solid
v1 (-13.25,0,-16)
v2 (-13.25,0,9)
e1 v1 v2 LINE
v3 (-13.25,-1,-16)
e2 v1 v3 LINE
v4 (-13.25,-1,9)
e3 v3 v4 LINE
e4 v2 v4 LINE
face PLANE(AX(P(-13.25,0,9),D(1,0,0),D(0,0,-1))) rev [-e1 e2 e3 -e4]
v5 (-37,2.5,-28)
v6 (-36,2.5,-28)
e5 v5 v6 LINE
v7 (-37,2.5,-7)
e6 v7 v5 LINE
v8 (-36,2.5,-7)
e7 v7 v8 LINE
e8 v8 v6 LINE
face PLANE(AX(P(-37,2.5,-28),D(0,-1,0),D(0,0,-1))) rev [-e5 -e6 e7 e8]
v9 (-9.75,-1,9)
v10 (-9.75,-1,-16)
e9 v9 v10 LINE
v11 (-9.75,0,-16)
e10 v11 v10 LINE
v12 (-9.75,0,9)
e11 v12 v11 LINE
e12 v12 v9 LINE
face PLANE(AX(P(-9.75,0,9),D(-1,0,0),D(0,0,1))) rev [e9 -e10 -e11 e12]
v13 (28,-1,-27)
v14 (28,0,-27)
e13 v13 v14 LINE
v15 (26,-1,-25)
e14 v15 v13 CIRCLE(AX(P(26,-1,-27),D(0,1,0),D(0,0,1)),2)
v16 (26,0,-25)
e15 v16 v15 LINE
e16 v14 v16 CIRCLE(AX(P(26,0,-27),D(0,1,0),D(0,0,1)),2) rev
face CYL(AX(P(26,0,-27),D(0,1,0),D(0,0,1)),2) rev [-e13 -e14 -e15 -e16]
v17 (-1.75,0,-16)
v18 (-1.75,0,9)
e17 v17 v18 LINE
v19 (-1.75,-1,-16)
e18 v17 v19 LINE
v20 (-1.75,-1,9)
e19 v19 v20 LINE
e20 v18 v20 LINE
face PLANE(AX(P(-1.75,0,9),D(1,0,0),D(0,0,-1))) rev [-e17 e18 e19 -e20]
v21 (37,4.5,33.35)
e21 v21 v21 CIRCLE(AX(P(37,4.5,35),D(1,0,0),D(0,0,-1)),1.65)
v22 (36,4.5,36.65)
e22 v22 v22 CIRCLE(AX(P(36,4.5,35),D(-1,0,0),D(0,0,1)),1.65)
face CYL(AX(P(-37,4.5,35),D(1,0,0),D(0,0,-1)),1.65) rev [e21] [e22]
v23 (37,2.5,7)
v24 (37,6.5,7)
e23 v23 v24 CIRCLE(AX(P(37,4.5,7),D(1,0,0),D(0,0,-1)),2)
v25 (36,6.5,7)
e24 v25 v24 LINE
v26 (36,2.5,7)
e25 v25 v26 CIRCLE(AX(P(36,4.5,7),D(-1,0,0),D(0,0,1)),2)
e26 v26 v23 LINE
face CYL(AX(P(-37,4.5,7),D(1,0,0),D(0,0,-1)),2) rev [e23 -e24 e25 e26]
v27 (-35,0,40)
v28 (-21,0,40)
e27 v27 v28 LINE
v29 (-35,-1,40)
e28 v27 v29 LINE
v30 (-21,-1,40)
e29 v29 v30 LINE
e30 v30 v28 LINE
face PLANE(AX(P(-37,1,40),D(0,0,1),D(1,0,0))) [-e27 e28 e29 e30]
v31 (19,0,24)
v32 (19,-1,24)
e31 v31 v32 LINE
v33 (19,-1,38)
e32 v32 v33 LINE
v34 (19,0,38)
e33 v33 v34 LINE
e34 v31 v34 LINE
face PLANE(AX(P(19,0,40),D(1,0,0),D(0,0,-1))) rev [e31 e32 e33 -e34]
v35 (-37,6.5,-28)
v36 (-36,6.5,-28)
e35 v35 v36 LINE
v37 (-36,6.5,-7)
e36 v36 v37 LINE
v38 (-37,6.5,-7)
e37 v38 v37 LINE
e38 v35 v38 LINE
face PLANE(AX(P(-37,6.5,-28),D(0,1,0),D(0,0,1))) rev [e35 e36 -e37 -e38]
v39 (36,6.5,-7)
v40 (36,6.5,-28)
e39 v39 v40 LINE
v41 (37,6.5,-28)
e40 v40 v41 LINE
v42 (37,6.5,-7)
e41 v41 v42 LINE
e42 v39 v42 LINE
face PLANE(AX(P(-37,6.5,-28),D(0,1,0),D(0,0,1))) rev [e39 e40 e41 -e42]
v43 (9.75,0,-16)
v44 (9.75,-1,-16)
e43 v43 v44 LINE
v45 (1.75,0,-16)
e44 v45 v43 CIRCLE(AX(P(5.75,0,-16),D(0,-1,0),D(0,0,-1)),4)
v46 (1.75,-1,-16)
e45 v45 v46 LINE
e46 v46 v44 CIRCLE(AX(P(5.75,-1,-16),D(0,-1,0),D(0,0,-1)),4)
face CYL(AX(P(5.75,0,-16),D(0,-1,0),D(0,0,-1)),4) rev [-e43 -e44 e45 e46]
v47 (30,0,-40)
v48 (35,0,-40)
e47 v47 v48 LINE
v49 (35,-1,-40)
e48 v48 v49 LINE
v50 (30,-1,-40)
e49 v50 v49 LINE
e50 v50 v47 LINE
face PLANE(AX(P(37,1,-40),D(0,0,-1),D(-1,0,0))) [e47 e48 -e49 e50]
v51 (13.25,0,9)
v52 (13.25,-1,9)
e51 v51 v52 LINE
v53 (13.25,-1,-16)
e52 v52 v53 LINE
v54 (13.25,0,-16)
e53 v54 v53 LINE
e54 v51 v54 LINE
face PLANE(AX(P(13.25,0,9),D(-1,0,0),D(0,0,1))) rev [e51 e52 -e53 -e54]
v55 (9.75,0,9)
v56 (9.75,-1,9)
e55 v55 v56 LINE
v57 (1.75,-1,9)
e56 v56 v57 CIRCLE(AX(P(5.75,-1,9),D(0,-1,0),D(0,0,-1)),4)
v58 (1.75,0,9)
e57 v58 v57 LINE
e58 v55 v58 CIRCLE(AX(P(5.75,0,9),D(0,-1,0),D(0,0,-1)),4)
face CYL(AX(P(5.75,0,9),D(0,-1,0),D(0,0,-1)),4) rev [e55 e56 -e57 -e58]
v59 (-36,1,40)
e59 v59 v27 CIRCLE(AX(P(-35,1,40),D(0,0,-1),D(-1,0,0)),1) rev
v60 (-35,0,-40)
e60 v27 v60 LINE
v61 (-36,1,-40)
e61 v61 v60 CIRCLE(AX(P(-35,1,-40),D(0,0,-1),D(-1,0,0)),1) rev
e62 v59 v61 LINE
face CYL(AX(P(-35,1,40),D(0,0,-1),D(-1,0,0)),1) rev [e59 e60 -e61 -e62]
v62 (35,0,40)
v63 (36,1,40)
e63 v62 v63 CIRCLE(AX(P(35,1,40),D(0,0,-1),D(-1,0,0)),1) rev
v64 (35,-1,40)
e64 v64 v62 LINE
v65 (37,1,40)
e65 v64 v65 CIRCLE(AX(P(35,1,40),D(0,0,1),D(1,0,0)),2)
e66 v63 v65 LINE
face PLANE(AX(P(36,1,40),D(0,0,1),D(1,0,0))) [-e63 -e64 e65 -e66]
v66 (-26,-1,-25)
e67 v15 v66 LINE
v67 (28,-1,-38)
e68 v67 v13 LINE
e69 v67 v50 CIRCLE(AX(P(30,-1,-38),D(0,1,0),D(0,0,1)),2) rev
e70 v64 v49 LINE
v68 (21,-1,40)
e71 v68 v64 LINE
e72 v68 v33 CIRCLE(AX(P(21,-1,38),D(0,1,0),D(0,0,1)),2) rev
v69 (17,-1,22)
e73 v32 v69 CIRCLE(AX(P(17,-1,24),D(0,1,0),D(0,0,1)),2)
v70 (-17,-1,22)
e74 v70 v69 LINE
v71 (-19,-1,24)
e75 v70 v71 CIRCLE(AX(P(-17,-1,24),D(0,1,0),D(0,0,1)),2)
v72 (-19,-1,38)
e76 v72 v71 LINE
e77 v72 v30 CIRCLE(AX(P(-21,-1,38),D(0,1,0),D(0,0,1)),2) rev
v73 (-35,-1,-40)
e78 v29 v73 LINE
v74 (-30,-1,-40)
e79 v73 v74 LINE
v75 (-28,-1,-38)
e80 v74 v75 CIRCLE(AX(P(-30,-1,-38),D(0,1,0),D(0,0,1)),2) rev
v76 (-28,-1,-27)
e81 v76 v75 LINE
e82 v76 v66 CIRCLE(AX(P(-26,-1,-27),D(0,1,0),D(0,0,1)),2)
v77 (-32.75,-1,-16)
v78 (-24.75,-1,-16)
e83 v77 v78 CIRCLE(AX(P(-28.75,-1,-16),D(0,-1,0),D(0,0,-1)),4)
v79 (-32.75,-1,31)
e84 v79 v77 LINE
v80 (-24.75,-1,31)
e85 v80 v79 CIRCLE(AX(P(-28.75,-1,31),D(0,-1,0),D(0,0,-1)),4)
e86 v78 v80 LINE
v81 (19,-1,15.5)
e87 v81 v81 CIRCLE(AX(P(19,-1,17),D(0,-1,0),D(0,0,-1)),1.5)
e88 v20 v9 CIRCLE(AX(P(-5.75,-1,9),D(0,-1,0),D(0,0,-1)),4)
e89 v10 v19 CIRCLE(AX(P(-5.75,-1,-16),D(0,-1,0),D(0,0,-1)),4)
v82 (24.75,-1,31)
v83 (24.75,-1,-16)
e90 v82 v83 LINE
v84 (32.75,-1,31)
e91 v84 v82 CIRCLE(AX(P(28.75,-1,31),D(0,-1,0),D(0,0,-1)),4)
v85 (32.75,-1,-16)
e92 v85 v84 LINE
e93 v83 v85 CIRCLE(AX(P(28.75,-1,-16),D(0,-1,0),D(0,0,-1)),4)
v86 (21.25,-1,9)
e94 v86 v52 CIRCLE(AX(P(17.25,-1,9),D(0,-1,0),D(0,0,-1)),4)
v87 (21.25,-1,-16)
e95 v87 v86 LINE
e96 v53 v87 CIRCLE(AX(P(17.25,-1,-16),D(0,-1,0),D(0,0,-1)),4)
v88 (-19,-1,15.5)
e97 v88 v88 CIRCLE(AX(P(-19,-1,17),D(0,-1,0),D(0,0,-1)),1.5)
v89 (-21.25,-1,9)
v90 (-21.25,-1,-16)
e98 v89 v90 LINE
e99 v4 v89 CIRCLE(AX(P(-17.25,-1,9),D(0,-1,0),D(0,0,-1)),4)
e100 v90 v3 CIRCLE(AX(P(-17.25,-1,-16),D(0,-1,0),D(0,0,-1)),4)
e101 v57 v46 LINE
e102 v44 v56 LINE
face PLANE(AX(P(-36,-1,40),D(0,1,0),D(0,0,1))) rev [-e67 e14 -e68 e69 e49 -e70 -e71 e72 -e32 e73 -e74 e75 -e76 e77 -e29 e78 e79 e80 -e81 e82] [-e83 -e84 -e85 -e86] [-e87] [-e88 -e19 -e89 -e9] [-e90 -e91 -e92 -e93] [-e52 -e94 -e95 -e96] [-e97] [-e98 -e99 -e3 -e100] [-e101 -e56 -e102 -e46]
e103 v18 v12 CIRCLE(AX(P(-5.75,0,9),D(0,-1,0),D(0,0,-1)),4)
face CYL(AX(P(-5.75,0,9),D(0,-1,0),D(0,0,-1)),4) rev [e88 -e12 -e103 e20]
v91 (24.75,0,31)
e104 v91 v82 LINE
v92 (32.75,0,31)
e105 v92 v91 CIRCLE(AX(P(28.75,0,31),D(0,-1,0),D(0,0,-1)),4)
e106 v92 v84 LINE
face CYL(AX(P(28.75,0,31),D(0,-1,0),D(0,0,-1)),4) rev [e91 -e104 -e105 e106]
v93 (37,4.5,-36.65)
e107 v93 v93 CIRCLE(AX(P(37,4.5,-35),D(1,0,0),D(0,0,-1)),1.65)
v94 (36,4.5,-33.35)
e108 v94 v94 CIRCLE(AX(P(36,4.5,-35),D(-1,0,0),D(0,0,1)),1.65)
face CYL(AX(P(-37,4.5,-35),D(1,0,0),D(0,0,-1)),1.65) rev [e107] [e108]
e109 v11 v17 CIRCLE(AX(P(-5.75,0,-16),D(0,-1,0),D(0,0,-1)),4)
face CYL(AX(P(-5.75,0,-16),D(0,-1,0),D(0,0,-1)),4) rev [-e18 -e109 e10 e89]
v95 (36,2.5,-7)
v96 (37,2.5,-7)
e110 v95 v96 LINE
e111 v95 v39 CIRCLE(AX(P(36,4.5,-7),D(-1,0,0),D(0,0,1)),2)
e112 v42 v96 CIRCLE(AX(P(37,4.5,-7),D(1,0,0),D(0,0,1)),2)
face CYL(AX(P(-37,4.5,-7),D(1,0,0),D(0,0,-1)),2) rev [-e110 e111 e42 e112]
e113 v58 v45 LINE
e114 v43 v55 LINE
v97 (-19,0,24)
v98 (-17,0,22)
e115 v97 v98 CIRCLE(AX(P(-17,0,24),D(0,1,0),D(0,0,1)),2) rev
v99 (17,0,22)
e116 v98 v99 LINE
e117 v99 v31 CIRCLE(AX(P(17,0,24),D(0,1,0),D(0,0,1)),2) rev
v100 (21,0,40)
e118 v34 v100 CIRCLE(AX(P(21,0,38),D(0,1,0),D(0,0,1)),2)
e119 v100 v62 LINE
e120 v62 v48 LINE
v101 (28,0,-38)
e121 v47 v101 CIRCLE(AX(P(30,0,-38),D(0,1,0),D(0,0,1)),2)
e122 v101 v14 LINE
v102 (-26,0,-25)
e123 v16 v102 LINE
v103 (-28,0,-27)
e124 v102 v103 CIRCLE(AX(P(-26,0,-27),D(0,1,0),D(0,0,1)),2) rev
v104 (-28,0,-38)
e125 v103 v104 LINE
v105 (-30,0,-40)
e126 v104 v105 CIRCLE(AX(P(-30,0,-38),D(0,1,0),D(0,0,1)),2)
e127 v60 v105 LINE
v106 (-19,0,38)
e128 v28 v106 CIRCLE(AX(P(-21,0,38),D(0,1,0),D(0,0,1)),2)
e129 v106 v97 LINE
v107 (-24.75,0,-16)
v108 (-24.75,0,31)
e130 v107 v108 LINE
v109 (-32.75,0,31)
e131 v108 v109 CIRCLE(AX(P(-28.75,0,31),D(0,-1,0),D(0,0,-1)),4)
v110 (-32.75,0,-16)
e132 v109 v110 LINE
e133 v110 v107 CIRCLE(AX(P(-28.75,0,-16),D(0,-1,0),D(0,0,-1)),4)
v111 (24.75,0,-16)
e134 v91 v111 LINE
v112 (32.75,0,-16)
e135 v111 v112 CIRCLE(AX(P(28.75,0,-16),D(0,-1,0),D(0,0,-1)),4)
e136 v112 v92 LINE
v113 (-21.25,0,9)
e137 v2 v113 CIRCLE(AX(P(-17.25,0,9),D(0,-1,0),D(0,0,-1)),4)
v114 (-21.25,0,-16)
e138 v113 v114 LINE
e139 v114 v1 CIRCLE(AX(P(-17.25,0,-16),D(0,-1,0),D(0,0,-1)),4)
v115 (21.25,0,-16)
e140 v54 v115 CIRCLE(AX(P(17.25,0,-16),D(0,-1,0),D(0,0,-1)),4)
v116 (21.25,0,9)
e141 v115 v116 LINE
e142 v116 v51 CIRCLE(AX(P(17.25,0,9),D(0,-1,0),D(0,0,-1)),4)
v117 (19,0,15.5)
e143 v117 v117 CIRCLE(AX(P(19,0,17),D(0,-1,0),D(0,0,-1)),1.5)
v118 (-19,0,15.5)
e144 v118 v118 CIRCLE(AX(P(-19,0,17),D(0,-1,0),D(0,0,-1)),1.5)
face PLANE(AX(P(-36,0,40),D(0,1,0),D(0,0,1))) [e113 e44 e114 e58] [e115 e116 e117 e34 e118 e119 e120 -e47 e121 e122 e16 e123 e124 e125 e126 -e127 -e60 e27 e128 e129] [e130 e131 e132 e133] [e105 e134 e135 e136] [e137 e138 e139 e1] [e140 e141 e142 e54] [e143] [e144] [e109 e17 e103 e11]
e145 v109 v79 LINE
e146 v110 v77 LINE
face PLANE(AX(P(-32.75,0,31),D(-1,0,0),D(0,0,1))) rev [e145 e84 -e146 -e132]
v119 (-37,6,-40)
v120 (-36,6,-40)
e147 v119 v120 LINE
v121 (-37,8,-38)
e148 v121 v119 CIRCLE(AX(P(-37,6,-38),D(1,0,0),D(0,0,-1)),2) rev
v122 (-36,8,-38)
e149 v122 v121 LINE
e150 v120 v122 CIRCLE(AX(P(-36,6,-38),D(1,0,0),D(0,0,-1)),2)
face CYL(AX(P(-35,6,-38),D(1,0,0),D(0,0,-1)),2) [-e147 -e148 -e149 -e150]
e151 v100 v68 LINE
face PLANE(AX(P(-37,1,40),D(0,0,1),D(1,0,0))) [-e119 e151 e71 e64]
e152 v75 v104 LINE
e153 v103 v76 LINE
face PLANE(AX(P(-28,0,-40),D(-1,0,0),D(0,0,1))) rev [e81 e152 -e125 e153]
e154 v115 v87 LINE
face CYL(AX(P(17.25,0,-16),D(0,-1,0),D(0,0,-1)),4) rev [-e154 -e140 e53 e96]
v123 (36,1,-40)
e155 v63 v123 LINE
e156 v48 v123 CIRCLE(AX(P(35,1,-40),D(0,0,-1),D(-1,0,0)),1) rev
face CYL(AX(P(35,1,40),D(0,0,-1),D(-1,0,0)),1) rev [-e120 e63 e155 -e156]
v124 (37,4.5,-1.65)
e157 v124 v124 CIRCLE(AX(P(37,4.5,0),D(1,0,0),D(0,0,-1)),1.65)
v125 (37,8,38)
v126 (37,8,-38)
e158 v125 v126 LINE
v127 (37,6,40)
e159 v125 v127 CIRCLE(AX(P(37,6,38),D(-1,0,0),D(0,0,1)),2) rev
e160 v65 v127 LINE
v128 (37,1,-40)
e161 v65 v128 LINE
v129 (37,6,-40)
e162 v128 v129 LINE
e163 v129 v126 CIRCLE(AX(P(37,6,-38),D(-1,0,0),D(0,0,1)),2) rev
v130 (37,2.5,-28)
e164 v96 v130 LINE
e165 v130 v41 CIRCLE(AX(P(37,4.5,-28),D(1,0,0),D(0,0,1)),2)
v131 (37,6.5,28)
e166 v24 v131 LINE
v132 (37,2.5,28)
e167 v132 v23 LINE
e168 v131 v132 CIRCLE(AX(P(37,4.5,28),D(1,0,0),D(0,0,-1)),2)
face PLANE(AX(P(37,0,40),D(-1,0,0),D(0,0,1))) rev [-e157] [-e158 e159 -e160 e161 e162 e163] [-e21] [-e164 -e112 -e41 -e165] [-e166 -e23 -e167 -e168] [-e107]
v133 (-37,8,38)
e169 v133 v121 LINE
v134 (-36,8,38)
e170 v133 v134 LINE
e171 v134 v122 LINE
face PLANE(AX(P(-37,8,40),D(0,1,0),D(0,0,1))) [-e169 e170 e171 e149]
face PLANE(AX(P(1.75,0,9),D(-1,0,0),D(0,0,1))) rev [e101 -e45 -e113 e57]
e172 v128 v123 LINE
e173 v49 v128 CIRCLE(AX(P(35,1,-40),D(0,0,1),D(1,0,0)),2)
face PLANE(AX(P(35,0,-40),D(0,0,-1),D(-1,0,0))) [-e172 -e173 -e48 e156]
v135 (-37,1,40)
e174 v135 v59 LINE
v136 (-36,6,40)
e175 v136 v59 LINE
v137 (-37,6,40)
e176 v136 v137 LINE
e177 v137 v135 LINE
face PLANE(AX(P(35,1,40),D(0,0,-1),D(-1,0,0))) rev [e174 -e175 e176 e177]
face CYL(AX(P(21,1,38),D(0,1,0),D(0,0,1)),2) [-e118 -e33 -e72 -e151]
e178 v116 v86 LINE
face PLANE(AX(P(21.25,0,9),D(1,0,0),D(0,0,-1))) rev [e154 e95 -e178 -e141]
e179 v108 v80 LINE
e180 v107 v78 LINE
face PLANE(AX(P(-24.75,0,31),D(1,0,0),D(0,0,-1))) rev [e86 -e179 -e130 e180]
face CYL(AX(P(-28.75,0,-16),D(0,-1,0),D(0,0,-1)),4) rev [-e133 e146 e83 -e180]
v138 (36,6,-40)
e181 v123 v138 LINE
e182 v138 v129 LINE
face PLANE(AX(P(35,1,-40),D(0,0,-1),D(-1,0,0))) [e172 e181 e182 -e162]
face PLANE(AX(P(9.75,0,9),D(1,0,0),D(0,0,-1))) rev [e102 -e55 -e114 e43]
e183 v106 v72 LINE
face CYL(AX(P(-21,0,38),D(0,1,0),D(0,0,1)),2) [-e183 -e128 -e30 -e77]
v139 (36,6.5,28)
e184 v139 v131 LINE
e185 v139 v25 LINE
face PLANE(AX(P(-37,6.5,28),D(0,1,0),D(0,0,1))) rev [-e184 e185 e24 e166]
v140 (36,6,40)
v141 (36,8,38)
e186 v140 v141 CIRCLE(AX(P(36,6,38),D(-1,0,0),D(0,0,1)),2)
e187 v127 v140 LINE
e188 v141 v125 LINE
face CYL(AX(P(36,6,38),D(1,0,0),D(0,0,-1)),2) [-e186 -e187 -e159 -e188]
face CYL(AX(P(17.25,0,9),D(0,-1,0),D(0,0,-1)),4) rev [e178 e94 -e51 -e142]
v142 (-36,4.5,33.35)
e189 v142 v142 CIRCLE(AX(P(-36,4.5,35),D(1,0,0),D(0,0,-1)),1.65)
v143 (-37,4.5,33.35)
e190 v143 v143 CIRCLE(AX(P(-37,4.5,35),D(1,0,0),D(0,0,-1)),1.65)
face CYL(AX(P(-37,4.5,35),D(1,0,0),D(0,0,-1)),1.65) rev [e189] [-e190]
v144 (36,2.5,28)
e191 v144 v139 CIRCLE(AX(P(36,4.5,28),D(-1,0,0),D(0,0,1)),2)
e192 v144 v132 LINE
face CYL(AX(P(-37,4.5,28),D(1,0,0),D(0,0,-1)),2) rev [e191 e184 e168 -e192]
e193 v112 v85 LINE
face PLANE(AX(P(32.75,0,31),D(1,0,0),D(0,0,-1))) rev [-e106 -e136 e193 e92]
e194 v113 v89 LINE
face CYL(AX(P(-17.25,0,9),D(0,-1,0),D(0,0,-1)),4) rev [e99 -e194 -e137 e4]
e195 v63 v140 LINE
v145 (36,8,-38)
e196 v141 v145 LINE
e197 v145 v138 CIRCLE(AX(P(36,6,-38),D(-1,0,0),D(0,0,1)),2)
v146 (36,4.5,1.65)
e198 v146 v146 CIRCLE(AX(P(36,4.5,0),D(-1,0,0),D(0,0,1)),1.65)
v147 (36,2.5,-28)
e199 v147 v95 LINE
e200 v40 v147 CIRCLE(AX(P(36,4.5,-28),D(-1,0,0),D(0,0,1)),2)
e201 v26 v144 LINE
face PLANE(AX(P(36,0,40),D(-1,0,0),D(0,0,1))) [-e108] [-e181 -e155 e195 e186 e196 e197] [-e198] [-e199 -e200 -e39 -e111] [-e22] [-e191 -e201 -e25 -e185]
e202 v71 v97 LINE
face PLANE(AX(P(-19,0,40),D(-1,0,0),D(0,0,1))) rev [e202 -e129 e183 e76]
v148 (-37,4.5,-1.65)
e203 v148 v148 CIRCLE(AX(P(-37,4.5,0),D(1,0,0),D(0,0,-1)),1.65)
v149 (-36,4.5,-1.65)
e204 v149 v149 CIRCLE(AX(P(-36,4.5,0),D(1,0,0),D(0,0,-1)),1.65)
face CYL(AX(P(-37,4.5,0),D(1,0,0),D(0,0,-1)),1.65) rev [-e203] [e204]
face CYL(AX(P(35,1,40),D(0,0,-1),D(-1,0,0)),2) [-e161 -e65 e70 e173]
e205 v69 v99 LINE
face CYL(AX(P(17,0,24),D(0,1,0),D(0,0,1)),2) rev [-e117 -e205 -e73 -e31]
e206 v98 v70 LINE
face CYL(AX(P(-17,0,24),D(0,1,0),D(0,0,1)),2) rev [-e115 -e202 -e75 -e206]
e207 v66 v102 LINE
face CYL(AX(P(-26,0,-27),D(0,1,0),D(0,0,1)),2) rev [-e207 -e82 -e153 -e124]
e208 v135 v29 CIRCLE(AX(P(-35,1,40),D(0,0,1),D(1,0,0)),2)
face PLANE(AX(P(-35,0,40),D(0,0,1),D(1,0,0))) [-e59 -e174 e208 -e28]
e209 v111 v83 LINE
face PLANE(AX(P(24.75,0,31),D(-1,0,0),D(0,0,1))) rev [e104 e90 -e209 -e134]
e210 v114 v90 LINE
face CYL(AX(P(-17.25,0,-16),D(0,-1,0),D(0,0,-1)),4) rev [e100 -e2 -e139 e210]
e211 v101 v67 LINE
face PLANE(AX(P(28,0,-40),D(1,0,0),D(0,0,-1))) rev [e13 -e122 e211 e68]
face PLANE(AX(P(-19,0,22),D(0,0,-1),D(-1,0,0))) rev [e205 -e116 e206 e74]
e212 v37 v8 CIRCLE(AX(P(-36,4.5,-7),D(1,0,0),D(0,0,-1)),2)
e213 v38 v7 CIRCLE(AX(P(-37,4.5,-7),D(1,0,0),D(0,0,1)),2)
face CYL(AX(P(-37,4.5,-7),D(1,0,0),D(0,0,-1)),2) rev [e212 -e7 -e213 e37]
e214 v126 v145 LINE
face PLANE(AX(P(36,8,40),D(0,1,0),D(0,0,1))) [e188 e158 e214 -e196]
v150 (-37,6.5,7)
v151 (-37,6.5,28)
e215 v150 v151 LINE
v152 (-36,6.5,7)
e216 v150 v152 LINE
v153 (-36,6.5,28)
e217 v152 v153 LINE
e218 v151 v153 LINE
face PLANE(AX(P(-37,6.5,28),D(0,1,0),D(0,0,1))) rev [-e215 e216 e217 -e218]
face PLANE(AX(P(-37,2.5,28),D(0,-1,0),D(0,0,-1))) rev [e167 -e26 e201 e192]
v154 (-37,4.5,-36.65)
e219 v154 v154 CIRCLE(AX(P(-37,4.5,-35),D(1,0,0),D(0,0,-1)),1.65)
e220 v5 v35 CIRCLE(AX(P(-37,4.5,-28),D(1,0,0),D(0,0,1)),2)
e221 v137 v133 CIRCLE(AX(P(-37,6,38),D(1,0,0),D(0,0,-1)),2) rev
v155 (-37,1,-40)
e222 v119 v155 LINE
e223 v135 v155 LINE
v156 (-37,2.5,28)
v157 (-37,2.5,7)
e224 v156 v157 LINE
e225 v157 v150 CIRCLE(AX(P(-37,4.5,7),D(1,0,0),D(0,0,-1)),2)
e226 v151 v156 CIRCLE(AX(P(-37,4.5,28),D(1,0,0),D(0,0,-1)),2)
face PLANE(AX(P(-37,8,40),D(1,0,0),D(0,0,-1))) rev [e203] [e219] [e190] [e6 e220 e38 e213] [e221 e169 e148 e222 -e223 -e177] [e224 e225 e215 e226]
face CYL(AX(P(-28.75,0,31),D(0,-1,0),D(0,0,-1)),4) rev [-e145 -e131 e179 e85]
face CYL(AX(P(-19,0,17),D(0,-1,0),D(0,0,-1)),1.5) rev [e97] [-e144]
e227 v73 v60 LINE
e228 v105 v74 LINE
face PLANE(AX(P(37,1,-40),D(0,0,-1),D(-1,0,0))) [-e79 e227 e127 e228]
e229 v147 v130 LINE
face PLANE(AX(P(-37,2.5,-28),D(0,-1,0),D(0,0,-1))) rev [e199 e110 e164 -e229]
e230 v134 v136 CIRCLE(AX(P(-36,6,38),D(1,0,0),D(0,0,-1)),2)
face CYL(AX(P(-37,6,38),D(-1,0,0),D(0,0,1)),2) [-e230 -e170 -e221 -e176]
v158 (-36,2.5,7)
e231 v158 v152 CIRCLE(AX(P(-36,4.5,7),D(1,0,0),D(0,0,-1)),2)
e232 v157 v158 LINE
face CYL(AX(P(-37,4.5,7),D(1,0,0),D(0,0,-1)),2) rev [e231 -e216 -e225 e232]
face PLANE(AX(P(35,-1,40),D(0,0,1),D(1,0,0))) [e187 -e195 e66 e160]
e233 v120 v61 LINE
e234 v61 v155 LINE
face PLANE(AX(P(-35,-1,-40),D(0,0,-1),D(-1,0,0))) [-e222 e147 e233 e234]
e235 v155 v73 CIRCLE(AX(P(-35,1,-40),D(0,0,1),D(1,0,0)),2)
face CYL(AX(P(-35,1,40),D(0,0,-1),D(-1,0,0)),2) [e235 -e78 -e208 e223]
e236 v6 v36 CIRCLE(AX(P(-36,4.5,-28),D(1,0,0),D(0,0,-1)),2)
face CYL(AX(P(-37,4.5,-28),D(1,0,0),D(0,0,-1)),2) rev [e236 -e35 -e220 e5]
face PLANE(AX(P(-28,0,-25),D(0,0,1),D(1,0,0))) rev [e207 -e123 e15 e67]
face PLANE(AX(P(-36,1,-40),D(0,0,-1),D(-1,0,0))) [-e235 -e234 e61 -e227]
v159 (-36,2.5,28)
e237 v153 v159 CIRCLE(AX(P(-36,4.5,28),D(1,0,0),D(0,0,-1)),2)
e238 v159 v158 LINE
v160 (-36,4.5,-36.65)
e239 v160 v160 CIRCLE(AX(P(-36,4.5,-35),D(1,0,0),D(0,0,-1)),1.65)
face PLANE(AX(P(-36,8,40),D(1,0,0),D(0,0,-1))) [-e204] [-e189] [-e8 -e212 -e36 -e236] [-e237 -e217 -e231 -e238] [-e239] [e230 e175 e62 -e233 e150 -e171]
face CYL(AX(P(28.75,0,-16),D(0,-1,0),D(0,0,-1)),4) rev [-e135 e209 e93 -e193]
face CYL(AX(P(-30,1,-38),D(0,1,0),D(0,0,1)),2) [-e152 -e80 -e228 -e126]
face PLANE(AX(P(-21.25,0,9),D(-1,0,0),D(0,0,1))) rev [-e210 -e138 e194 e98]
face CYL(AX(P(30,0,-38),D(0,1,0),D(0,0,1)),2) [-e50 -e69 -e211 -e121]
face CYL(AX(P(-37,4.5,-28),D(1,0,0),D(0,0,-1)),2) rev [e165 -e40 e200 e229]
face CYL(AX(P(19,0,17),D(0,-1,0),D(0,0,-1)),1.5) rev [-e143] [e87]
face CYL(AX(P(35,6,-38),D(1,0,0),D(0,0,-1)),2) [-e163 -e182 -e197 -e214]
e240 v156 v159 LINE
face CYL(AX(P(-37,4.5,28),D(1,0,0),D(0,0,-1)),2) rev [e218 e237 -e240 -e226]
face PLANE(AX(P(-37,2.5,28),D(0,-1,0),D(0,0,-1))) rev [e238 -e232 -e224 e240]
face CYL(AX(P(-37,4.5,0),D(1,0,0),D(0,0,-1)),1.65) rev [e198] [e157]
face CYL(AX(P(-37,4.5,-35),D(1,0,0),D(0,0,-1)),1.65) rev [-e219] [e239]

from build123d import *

# Parameters (mm, degrees)
SM_BASE_FLANGE_1_DEPTH   = 40
CUT_EXTRUDE_1_DEPTH      = 56.072679252
CUT_EXTRUDE_1_DEPTH_BACK = 56.072679252
SKETCH_6_R               = 1.65
CUT_EXTRUDE_3_DEPTH      = 56.072679252
CUT_EXTRUDE_3_DEPTH_BACK = 56.072679252
SKETCH_7_R               = 1.5
SKETCH_7_W               = 56
SKETCH_7_H               = 15
SKETCH_7_W_2             = 38
SKETCH_7_H_2             = 18
CUT_EXTRUDE_2_DEPTH      = 10
FILLET_1_R               = 2


# Sheet-metal steps are written as plain solids
with BuildPart() as part:
    # Sketch 1 → 基体-法兰1 (new, symmetric)
    with BuildSketch(Plane.XY):
        with BuildLine():
            Line((-36, 8), (-36, 1))
            ThreePointArc((-36, 1), (-35.707106781, 0.292893219), (-35, 0))
            Line((-35, 0), (35, 0))
            ThreePointArc((35, 0), (35.707106781, 0.292893219), (36, 1))
            Line((36, 1), (36, 8))
            Line((36, 8), (37, 8))
            Line((37, 8), (37, 1))
            ThreePointArc((37, 1), (36.414213562, -0.414213562), (35, -1))
            Line((35, -1), (-35, -1))
            ThreePointArc((-35, -1), (-36.414213562, -0.414213562), (-37, 1))
            Line((-37, 1), (-37, 8))
            Line((-37, 8), (-36, 8))
        make_face()
    extrude(amount=SM_BASE_FLANGE_1_DEPTH, both=True)

    # 草图6 → 切除-拉伸1 (cut, two sides: drawn at the far end of the back side and taken through both)
    with BuildSketch(Plane(origin=(0, 0, 0), x_dir=(0, 0, -1), z_dir=(1, 0, 0)).offset(-CUT_EXTRUDE_1_DEPTH_BACK)):
        with Locations((-35, 4.5)):
            Circle(SKETCH_6_R)
        with Locations((35, 4.5)):
            Circle(SKETCH_6_R)
        with Locations((0, 4.5)):
            Circle(SKETCH_6_R)
    extrude(amount=CUT_EXTRUDE_1_DEPTH + CUT_EXTRUDE_1_DEPTH_BACK, mode=Mode.SUBTRACT)

    # 草图8 → 切除-拉伸3 (cut, two sides: drawn at the far end of the back side and taken through both)
    with BuildSketch(Plane(origin=(0, 0, 0), x_dir=(0, 0, -1), z_dir=(1, 0, 0)).offset(-CUT_EXTRUDE_3_DEPTH_BACK)):
        with BuildLine():
            Line((-28, 6.5), (-7, 6.5))
            ThreePointArc((-7, 6.5), (-5, 4.5), (-7, 2.5))
            Line((-7, 2.5), (-28, 2.5))
            ThreePointArc((-28, 2.5), (-30, 4.5), (-28, 6.5))
        make_face()
        with BuildLine():
            Line((28, 6.5), (7, 6.5))
            ThreePointArc((7, 6.5), (5, 4.5), (7, 2.5))
            Line((7, 2.5), (28, 2.5))
            ThreePointArc((28, 2.5), (30, 4.5), (28, 6.5))
        make_face()
    extrude(amount=CUT_EXTRUDE_3_DEPTH + CUT_EXTRUDE_3_DEPTH_BACK, mode=Mode.SUBTRACT)

    # 草图7 → 切除-拉伸2 (cut)
    with BuildSketch(Plane.XZ.offset(1)):
        with Locations(Location((19, 17, 0), (0, 0, 270))):
            Circle(SKETCH_7_R)
        with Locations(Location((-19, 17, 0), (0, 0, 270))):
            Circle(SKETCH_7_R)
        with BuildLine():
            Line((-24.75, 31), (-24.75, -16))
            ThreePointArc((-24.75, -16), (-28.75, -20), (-32.75, -16))
            Line((-32.75, -16), (-32.75, 31))
            ThreePointArc((-32.75, 31), (-28.75, 35), (-24.75, 31))
        make_face()
        with BuildLine():
            Line((-13.25, 9), (-13.25, -16))
            ThreePointArc((-13.25, -16), (-17.25, -20), (-21.25, -16))
            Line((-21.25, -16), (-21.25, 9))
            ThreePointArc((-21.25, 9), (-17.25, 13), (-13.25, 9))
        make_face()
        with BuildLine():
            Line((-1.75, 9), (-1.75, -16))
            ThreePointArc((-1.75, -16), (-5.75, -20), (-9.75, -16))
            Line((-9.75, -16), (-9.75, 9))
            ThreePointArc((-9.75, 9), (-5.75, 13), (-1.75, 9))
        make_face()
        with BuildLine():
            Line((21.25, 9), (21.25, -16))
            ThreePointArc((21.25, -16), (17.25, -20), (13.25, -16))
            Line((13.25, -16), (13.25, 9))
            ThreePointArc((13.25, 9), (17.25, 13), (21.25, 9))
        make_face()
        with BuildLine():
            Line((32.75, 31), (32.75, -16))
            ThreePointArc((32.75, -16), (28.75, -20), (24.75, -16))
            Line((24.75, -16), (24.75, 31))
            ThreePointArc((24.75, 31), (28.75, 35), (32.75, 31))
        make_face()
        with Locations((0, -32.5)):
            Rectangle(SKETCH_7_W, SKETCH_7_H)
        with BuildLine():
            Line((9.75, 9), (9.75, -16))
            ThreePointArc((9.75, -16), (5.75, -20), (1.75, -16))
            Line((1.75, -16), (1.75, 9))
            ThreePointArc((1.75, 9), (5.75, 13), (9.75, 9))
        make_face()
        with Locations((0, 31)):
            Rectangle(SKETCH_7_W_2, SKETCH_7_H_2)
    extrude(amount=-CUT_EXTRUDE_2_DEPTH, mode=Mode.SUBTRACT)

    # 圆角1
    fillet_1_edges = [part.edges().sort_by_distance(p)[0] for p in [
        (-36.5, 8, -40),
        (36.5, 8, -40),
        (-28, -0.5, -40),
        (-28, -0.5, -25),
        (28, -0.5, -25),
        (28, -0.5, -40),
        (-19, -0.5, 22),
        (-19, -0.5, 40),
        (19, -0.5, 40),
        (19, -0.5, 22),
        (-36.5, 8, 40),
        (36.5, 8, 40),
    ]]
    fillet(fillet_1_edges, radius=FILLET_1_R)


solid = part.part
